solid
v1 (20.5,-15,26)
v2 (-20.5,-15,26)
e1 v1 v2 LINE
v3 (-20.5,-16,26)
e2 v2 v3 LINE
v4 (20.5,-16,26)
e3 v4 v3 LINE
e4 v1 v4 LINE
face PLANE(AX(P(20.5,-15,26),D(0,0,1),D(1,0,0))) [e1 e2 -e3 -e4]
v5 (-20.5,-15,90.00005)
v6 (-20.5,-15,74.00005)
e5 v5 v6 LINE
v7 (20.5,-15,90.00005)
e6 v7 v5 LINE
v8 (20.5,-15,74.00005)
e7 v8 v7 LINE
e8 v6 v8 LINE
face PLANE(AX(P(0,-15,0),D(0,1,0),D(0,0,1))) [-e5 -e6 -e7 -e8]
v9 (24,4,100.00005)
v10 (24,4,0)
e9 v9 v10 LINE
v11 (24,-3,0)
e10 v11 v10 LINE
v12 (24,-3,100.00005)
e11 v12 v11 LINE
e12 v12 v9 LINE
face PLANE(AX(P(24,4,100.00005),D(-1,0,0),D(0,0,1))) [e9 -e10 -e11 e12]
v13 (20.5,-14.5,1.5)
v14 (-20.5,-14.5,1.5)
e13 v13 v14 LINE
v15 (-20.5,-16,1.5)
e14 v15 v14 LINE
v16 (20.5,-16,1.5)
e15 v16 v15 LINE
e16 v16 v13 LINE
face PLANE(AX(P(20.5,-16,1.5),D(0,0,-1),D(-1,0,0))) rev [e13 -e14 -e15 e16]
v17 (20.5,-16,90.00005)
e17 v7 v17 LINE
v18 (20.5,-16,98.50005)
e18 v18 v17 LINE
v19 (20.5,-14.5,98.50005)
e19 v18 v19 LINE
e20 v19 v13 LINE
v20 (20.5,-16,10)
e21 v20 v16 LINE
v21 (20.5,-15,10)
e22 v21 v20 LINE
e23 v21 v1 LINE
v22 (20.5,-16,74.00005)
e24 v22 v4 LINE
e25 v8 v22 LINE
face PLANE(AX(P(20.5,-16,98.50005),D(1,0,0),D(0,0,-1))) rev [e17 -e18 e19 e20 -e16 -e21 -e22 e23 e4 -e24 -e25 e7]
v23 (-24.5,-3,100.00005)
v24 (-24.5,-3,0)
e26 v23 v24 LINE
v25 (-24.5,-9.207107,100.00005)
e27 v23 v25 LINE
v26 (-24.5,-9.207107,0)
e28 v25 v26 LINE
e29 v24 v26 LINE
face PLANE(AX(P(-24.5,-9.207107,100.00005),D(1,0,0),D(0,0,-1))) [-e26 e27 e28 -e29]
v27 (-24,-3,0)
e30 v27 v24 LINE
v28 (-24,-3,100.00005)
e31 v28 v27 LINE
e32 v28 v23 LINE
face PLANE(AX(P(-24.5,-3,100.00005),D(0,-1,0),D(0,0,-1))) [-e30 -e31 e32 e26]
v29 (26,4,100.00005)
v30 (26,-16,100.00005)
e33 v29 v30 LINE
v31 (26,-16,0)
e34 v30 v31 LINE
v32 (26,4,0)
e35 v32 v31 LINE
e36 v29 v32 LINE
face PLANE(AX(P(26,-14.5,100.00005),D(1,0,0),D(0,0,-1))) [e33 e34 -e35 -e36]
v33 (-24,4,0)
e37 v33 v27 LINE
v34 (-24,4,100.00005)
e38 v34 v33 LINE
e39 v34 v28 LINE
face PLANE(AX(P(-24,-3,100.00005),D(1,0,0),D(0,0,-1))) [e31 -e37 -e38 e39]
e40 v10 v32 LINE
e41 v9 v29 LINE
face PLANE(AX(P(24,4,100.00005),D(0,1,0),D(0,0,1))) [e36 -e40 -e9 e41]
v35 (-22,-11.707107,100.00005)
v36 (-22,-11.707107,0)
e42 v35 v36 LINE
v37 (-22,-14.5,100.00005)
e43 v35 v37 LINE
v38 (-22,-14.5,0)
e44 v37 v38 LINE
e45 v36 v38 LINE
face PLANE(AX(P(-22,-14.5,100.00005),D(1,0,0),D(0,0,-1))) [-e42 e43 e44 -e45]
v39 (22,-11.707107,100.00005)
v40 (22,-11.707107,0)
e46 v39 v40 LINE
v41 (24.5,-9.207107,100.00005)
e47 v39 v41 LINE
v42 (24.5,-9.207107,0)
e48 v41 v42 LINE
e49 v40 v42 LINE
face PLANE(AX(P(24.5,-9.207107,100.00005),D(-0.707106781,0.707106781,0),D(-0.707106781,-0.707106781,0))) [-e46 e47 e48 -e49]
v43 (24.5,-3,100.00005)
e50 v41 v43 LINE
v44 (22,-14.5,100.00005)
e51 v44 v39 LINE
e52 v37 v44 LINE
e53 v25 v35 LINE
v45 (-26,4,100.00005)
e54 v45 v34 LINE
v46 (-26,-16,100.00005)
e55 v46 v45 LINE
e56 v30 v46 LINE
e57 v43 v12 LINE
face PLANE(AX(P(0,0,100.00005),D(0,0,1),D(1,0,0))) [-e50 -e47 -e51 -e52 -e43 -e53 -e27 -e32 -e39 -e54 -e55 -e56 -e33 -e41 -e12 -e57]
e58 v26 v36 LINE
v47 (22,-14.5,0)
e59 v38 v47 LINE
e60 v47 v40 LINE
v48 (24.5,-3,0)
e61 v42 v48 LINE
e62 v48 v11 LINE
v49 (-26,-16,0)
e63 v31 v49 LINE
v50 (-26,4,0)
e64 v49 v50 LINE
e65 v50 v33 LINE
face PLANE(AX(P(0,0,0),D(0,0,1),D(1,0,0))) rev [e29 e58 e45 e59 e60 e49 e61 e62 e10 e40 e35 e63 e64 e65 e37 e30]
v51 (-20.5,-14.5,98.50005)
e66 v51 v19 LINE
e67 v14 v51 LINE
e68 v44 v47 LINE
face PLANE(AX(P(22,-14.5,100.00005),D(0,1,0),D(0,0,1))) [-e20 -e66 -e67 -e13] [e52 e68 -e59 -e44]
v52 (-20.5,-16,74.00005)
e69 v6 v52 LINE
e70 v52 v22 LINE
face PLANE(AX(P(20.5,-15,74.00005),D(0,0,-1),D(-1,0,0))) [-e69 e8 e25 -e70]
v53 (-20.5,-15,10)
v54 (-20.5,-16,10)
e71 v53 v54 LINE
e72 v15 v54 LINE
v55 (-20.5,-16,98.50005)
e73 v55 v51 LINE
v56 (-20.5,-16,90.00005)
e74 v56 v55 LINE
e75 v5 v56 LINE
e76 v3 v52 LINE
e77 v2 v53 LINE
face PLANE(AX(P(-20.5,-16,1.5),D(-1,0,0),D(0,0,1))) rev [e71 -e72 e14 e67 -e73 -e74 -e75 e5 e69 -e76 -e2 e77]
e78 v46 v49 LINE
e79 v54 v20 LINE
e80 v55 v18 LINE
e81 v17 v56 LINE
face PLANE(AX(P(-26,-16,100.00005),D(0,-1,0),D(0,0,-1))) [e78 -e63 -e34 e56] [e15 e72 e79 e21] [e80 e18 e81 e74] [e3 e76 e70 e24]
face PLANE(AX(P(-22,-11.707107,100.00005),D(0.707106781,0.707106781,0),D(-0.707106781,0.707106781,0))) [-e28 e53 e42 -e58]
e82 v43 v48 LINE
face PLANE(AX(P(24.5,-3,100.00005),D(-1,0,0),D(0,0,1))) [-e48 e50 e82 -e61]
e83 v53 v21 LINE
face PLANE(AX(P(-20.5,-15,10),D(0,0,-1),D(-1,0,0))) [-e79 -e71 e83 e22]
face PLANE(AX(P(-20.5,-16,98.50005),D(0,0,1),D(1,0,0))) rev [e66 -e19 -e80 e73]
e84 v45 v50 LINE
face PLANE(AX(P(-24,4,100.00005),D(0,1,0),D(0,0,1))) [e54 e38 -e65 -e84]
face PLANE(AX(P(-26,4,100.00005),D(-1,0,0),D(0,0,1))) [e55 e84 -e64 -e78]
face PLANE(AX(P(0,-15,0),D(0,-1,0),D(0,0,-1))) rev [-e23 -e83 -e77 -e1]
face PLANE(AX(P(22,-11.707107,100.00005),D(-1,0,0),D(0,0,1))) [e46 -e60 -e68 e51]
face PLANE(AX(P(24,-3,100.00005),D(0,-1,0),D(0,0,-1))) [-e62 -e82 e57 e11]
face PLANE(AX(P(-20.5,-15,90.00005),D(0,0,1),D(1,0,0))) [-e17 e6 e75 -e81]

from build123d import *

# Parameters (mm, degrees)
RESSALTO_EXTRUS_O1_DEPTH = 100
RESSALTO_EXTRUS_O3_REACH = 107.835
ESBO_O3_W                = 45
ESBO_O3_H                = 1.5
CORTE_EXTRUS_O1_DEPTH    = 103.343783397
ESBO_O5_W                = 12
ESBO_O5_H                = 1.5
CORTE_EXTRUS_O2_DEPTH    = 106.834776893
ESBO_O6_W                = 45
ESBO_O6_H                = 2
RESSALTO_EXTRUS_O4_DEPTH = 25
ESBO_O7_W                = 2.8
ESBO_O7_H                = 2.8
CORTE_EXTRUS_O3_DEPTH    = 10
CORTE_EXTRUS_O4_DEPTH    = 104.788245963
RESSALTO_EXTRUS_O5_DEPTH = 100
ESBO_O10_W               = 0.5
ESBO_O10_H               = 8
CORTE_EXTRUS_O5_DEPTH    = 104.788245963
CHANFRO1_SIZE            = 3
CHANFRO2_SIZE            = 3
RESSALTO_EXTRUS_O6_DEPTH = 100
CORTE_EXTRUS_O6_DEPTH    = 105.556204981
ESBO_O13_W               = 41
ESBO_O13_H               = 97.00005
CORTE_EXTRUS_O7_DEPTH    = 105.967852222
ESBO_O14_W               = 41
ESBO_O14_H               = 16
RESSALTO_EXTRUS_O7_DEPTH = 1


with BuildPart() as part:
    # Esboço1 → Ressalto-extrusão1 (new body)
    with BuildSketch(Plane.XY):
        Polygon((-22.5, 12.5), (-22.5, -7.5), (-17.5, -12.5), (17.5, -12.5), (22.5, -7.5), (22.5, 12.5), (24, 12.5), (24, -9), (19, -14), (-19, -14), (-24, -9), (-24, 12.5), align=None)
    extrude(amount=RESSALTO_EXTRUS_O1_DEPTH)

    # Ressalto-extrusão3: up to this face of the body (flat: up to its plane)
    ressalto_extrus_o3_end = Plane(part.part.faces().sort_by_distance((-23.25, 12.5, 50))[0])
    # Esboço3 → Ressalto-extrusão3 (add, up to the picked face)
    with BuildSketch(Plane(origin=(0, -12.5, 0), x_dir=(1, 0, 0), z_dir=(0, 1, 0)), mode=Mode.PRIVATE) as ressalto_extrus_o3_sk1:
        with Locations((0, -0.75)):
            Rectangle(ESBO_O3_W, ESBO_O3_H)
    ressalto_extrus_o3_tool1 = split(extrude(ressalto_extrus_o3_sk1.sketch, amount=RESSALTO_EXTRUS_O3_REACH, mode=Mode.PRIVATE), bisect_by=ressalto_extrus_o3_end, keep=Keep.BOTH, mode=Mode.PRIVATE)
    add(ressalto_extrus_o3_tool1.solids().sort_by(Axis((0, -12.5, 0.75), (0, 1, 0)))[0])

    # Esboço4 → Corte-extrusão1 (cut, through all)
    with BuildSketch(Plane.XY.offset(1.5)):
        Polygon((-10, -12.5), (10, -12.5), (10, -7.5), (5, -2.5), (-5, -2.5), (-10, -7.5), align=None)
    extrude(amount=-CORTE_EXTRUS_O1_DEPTH, mode=Mode.SUBTRACT)

    # Esboço5 → Corte-extrusão2 (cut, through all)
    with BuildSketch(Plane(origin=(0, -12.5, 0), x_dir=(1, 0, 0), z_dir=(0, 1, 0))):
        with Locations((0, -2.25)):
            Rectangle(ESBO_O5_W, ESBO_O5_H)
    extrude(amount=-CORTE_EXTRUS_O2_DEPTH, mode=Mode.SUBTRACT)

    # Esboço6 → Ressalto-extrusão4 (add)
    with BuildSketch(Plane(origin=(0, -12.5, 0), x_dir=(1, 0, 0), z_dir=(0, 1, 0))):
        with Locations((0, -99)):
            Rectangle(ESBO_O6_W, ESBO_O6_H)
    extrude(amount=RESSALTO_EXTRUS_O4_DEPTH)

    # Esboço7 → Corte-extrusão3 (cut)
    with BuildSketch(Plane.XY.offset(100)):
        with Locations((-8, 8.5)):
            Rectangle(ESBO_O7_W, ESBO_O7_H)
        with Locations((-16, 8.5)):
            Rectangle(ESBO_O7_W, ESBO_O7_H)
        with Locations((0, 8.5)):
            Rectangle(ESBO_O7_W, ESBO_O7_H)
        with Locations((8, 8.5)):
            Rectangle(ESBO_O7_W, ESBO_O7_H)
        with Locations((16, 8.5)):
            Rectangle(ESBO_O7_W, ESBO_O7_H)
        with Locations((-8, 0.5)):
            Rectangle(ESBO_O7_W, ESBO_O7_H)
        with Locations((0, 0.5)):
            Rectangle(ESBO_O7_W, ESBO_O7_H)
        with Locations((8, 0.5)):
            Rectangle(ESBO_O7_W, ESBO_O7_H)
        with Locations((16, 0.5)):
            Rectangle(ESBO_O7_W, ESBO_O7_H)
        with Locations((-8, -7.5)):
            Rectangle(ESBO_O7_W, ESBO_O7_H)
        with Locations((0, -7.5)):
            Rectangle(ESBO_O7_W, ESBO_O7_H)
        with Locations((8, -7.5)):
            Rectangle(ESBO_O7_W, ESBO_O7_H)
        with Locations((16, -7.5)):
            Rectangle(ESBO_O7_W, ESBO_O7_H)
        with Locations((-16, 0.5)):
            Rectangle(ESBO_O7_W, ESBO_O7_H)
        with Locations((-16, -7.5)):
            Rectangle(ESBO_O7_W, ESBO_O7_H)
    extrude(amount=-CORTE_EXTRUS_O3_DEPTH, mode=Mode.SUBTRACT)

    # Esboço8 → Corte-extrusão4 (cut, through all)
    with BuildSketch(Plane(origin=(0, 0, 0), x_dir=(-1, 0, 0), z_dir=(0, 0, -1))):
        Polygon((-22.5, -10.5), (-22.5, -12.5), (-20.5, -12.5), align=None)
        Polygon((20.5, -12.5), (22.5, -12.5), (22.5, -10.5), align=None)
    extrude(amount=-CORTE_EXTRUS_O4_DEPTH, mode=Mode.SUBTRACT)

    # Esboço9 → Ressalto-extrusão5 (add, through all)
    with BuildSketch(Plane(origin=(0, 0, 0), x_dir=(-1, 0, 0), z_dir=(0, 0, -1))):
        Polygon((-19, -14), (-21.5, -14), (-21.5, -11.5), align=None)
        Polygon((19, -14), (21.5, -14), (21.5, -11.5), align=None)
    extrude(amount=-RESSALTO_EXTRUS_O5_DEPTH)

    # Esboço10 → Corte-extrusão5 (cut, through all)
    with BuildSketch(Plane(origin=(0, 0, 0), x_dir=(-1, 0, 0), z_dir=(0, 0, -1))):
        with Locations((-23.75, 0.5)):
            Rectangle(ESBO_O10_W, ESBO_O10_H)
        with Locations((23.75, 0.5)):
            Rectangle(ESBO_O10_W, ESBO_O10_H)
    extrude(amount=-CORTE_EXTRUS_O5_DEPTH, mode=Mode.SUBTRACT)

    # Chanfro1
    # the kernel refuses this chamfer: 3 mm, written as the material it adds along each edge
    with BuildSketch(Plane(origin=(22.5, -15.215048964, 98), x_dir=(0.027495876610586768, 0, -0.9996219169112968), z_dir=(0, 1, 0))) as chanfro1_piece_1_section:
        Polygon((CHANFRO1_SIZE * 0.999621916911, CHANFRO1_SIZE * 0.0274958766106), (-CHANFRO1_SIZE * 0.0274958766106, CHANFRO1_SIZE * 0.999621916911), (0, 0), align=None)
    chanfro1_piece_1 = extrude(amount=27.715048964, mode=Mode.PRIVATE)
    chanfro1_piece_1 = split(chanfro1_piece_1, bisect_by=Plane(origin=(27.146986971, -2.853013029, 96.73534202), z_dir=(-0.7071067811865475, 0.7071067811865476, 0)), keep=Keep.TOP, mode=Mode.PRIVATE)
    add(chanfro1_piece_1)
    with BuildSketch(Plane(origin=(12.04463656, -17.95536344, 98), x_dir=(-0.7068394360706735, 0.7068394360706735, 0.027495876610586778), z_dir=(0.7071067811865476, 0.7071067811865475, 0))) as chanfro1_piece_2_section:
        Polygon((CHANFRO1_SIZE * 0.999621916911, -CHANFRO1_SIZE * 0.0274958766106), (-CHANFRO1_SIZE * 0.0274958766106, -CHANFRO1_SIZE * 0.999621916911), (0, 0), align=None)
    chanfro1_piece_2 = extrude(amount=22.50116574, mode=Mode.PRIVATE)
    chanfro1_piece_2 = split(chanfro1_piece_2, bisect_by=Plane(origin=(16.362312496, -12.5, 97.266244129), z_dir=(0, 1, 0)), keep=Keep.TOP, mode=Mode.PRIVATE)
    chanfro1_piece_2 = split(chanfro1_piece_2, bisect_by=Plane(origin=(16.362312496, -8.9, 97.266244129), z_dir=(0, -1, 0)), keep=Keep.TOP, mode=Mode.PRIVATE)
    add(chanfro1_piece_2)
    with BuildSketch(Plane(origin=(12.04463656, -17.95536344, 98), x_dir=(-0.7068394360706735, 0.7068394360706735, 0.027495876610586778), z_dir=(0.7071067811865476, 0.7071067811865475, 0))) as chanfro1_piece_3_section:
        Polygon((CHANFRO1_SIZE * 0.999621916911, -CHANFRO1_SIZE * 0.0274958766106), (-CHANFRO1_SIZE * 0.0274958766106, -CHANFRO1_SIZE * 0.999621916911), (0, 0), align=None)
    chanfro1_piece_3 = extrude(amount=22.50116574, mode=Mode.PRIVATE)
    chanfro1_piece_3 = split(chanfro1_piece_3, bisect_by=Plane(origin=(22.5, -7.314063038, 97.124733651), z_dir=(-1, 0, 0)), keep=Keep.TOP, mode=Mode.PRIVATE)
    chanfro1_piece_3 = split(chanfro1_piece_3, bisect_by=Plane(origin=(17.4, -7.314063038, 97.124733651), z_dir=(1, 0, 0)), keep=Keep.TOP, mode=Mode.PRIVATE)
    add(chanfro1_piece_3)
    with BuildSketch(Plane(origin=(25.215048964, -12.5, 98), x_dir=(0, -0.02749587661058619, -0.9996219169112968), z_dir=(-1, 0, 0))) as chanfro1_piece_4_section:
        Polygon((CHANFRO1_SIZE * 0.999621916911, -CHANFRO1_SIZE * 0.0274958766106), (-CHANFRO1_SIZE * 0.0274958766106, -CHANFRO1_SIZE * 0.999621916911), (0, 0), align=None)
    chanfro1_piece_4 = extrude(amount=50.430097928, mode=Mode.PRIVATE)
    chanfro1_piece_4 = split(chanfro1_piece_4, bisect_by=Plane(origin=(-9.263513514, -20.736486486, 97.013513514), z_dir=(0.7071067811865475, 0.7071067811865476, 0)), keep=Keep.TOP, mode=Mode.PRIVATE)
    chanfro1_piece_4 = split(chanfro1_piece_4, bisect_by=Plane(origin=(9.263513514, -20.736486486, 97.013513514), z_dir=(-0.7071067811865475, 0.7071067811865476, 0)), keep=Keep.TOP, mode=Mode.PRIVATE)
    add(chanfro1_piece_4)
    with BuildSketch(Plane(origin=(-27.95536344, -2.04463656, 98), x_dir=(0.7068394360706733, 0.7068394360706736, 0.027495876610586757), z_dir=(0.7071067811865476, -0.7071067811865475, 0))) as chanfro1_piece_5_section:
        Polygon((CHANFRO1_SIZE * 0.999621916911, -CHANFRO1_SIZE * 0.0274958766106), (-CHANFRO1_SIZE * 0.0274958766106, -CHANFRO1_SIZE * 0.999621916911), (0, 0), align=None)
    chanfro1_piece_5 = extrude(amount=22.50116574, mode=Mode.PRIVATE)
    chanfro1_piece_5 = split(chanfro1_piece_5, bisect_by=Plane(origin=(-22.5, -3.439339828, 97.957106781), z_dir=(1, 0, 0)), keep=Keep.TOP, mode=Mode.PRIVATE)
    chanfro1_piece_5 = split(chanfro1_piece_5, bisect_by=Plane(origin=(-17.4, -3.439339828, 97.957106781), z_dir=(-1, 0, 0)), keep=Keep.TOP, mode=Mode.PRIVATE)
    add(chanfro1_piece_5)
    with BuildSketch(Plane(origin=(-27.95536344, -2.04463656, 98), x_dir=(0.7068394360706733, 0.7068394360706736, 0.027495876610586757), z_dir=(0.7071067811865476, -0.7071067811865475, 0))) as chanfro1_piece_6_section:
        Polygon((CHANFRO1_SIZE * 0.999621916911, -CHANFRO1_SIZE * 0.0274958766106), (-CHANFRO1_SIZE * 0.0274958766106, -CHANFRO1_SIZE * 0.999621916911), (0, 0), align=None)
    chanfro1_piece_6 = extrude(amount=22.50116574, mode=Mode.PRIVATE)
    chanfro1_piece_6 = split(chanfro1_piece_6, bisect_by=Plane(origin=(-16.362312496, -12.5, 97.266244129), z_dir=(0, 1, 0)), keep=Keep.TOP, mode=Mode.PRIVATE)
    chanfro1_piece_6 = split(chanfro1_piece_6, bisect_by=Plane(origin=(-16.362312496, -8.9, 97.266244129), z_dir=(0, -1, 0)), keep=Keep.TOP, mode=Mode.PRIVATE)
    add(chanfro1_piece_6)
    with BuildSketch(Plane(origin=(-22.5, -15.215048964, 98), x_dir=(-0.027495876610586768, 0, -0.9996219169112968), z_dir=(0, 1, 0))) as chanfro1_piece_7_section:
        Polygon((CHANFRO1_SIZE * 0.999621916911, -CHANFRO1_SIZE * 0.0274958766106), (-CHANFRO1_SIZE * 0.0274958766106, -CHANFRO1_SIZE * 0.999621916911), (0, 0), align=None)
    chanfro1_piece_7 = extrude(amount=27.715048964, mode=Mode.PRIVATE)
    chanfro1_piece_7 = split(chanfro1_piece_7, bisect_by=Plane(origin=(-27.146986971, -2.853013029, 96.73534202), z_dir=(0.7071067811865475, 0.7071067811865476, 0)), keep=Keep.TOP, mode=Mode.PRIVATE)
    add(chanfro1_piece_7)

    # Chanfro2
    chanfro2_edges = [part.edges().sort_by_distance(p)[0] for p in [
        (-13.75, -12.5, 1.5),
        (20, -10, 1.5),
        (-22.5, 2.5, 1.5),
        (-20, -10, 1.5),
        (22.5, 2.5, 1.5),
        (13.75, -12.5, 1.5),
    ]]
    chamfer(chanfro2_edges, length=CHANFRO2_SIZE)

    # Esboço12 → Corte-extrusão6 (cut, through all)
    with BuildSketch(Plane(origin=(0, 0, 0), x_dir=(-1, 0, 0), z_dir=(0, 0, -1))):
        Polygon((24, -9), (24, -3.5), (23.5, -3.5), (23.5, 4.5), (24, 4.5), (24, 12.5), (-24, 12.5), (-24, 4.5), (-23.5, 4.5), (-23.5, -3.5), (-24, -3.5), (-24, -9), (-21.5, -11.5), (-21.5, -14), (21.5, -14), (21.5, -11.5), align=None)
    extrude(amount=-CORTE_EXTRUS_O6_DEPTH, mode=Mode.SUBTRACT)


with BuildPart() as body_2:
    # Esboço11 → Ressalto-extrusão6 (new, through all)
    with BuildSketch(Plane(origin=(0, 0, 0), x_dir=(-1, 0, 0), z_dir=(0, 0, -1))):
        Polygon((24.5, -9.207106781), (24.5, -3), (24, -3), (24, 4), (26, 4), (26, -14.5), (26, -16), (-26, -16), (-26, -14.5), (-26, 4), (-24, 4), (-24, -3), (-24.5, -3), (-24.5, -9.207106781), (-22, -11.707106781), (-22, -14.5), (22, -14.5), (22, -11.707106781), align=None)
    extrude(amount=-RESSALTO_EXTRUS_O6_DEPTH)

    # Esboço13 → Corte-extrusão7 (cut, through all)
    with BuildSketch(Plane(origin=(0, -14.5, 0), x_dir=(1, 0, 0), z_dir=(0, 1, 0))):
        with Locations((0, -50.000025)):
            Rectangle(ESBO_O13_W, ESBO_O13_H)
    extrude(amount=-CORTE_EXTRUS_O7_DEPTH, mode=Mode.SUBTRACT)

    # Esboço14 → Ressalto-extrusão7 (add)
    with BuildSketch(Plane.XZ.offset(16)):
        with Locations((0, 82.00005)):
            Rectangle(ESBO_O14_W, ESBO_O14_H)
        with Locations((0, 18)):
            Rectangle(ESBO_O14_W, ESBO_O14_H)
    extrude(amount=-RESSALTO_EXTRUS_O7_DEPTH)


solid = body_2.part
